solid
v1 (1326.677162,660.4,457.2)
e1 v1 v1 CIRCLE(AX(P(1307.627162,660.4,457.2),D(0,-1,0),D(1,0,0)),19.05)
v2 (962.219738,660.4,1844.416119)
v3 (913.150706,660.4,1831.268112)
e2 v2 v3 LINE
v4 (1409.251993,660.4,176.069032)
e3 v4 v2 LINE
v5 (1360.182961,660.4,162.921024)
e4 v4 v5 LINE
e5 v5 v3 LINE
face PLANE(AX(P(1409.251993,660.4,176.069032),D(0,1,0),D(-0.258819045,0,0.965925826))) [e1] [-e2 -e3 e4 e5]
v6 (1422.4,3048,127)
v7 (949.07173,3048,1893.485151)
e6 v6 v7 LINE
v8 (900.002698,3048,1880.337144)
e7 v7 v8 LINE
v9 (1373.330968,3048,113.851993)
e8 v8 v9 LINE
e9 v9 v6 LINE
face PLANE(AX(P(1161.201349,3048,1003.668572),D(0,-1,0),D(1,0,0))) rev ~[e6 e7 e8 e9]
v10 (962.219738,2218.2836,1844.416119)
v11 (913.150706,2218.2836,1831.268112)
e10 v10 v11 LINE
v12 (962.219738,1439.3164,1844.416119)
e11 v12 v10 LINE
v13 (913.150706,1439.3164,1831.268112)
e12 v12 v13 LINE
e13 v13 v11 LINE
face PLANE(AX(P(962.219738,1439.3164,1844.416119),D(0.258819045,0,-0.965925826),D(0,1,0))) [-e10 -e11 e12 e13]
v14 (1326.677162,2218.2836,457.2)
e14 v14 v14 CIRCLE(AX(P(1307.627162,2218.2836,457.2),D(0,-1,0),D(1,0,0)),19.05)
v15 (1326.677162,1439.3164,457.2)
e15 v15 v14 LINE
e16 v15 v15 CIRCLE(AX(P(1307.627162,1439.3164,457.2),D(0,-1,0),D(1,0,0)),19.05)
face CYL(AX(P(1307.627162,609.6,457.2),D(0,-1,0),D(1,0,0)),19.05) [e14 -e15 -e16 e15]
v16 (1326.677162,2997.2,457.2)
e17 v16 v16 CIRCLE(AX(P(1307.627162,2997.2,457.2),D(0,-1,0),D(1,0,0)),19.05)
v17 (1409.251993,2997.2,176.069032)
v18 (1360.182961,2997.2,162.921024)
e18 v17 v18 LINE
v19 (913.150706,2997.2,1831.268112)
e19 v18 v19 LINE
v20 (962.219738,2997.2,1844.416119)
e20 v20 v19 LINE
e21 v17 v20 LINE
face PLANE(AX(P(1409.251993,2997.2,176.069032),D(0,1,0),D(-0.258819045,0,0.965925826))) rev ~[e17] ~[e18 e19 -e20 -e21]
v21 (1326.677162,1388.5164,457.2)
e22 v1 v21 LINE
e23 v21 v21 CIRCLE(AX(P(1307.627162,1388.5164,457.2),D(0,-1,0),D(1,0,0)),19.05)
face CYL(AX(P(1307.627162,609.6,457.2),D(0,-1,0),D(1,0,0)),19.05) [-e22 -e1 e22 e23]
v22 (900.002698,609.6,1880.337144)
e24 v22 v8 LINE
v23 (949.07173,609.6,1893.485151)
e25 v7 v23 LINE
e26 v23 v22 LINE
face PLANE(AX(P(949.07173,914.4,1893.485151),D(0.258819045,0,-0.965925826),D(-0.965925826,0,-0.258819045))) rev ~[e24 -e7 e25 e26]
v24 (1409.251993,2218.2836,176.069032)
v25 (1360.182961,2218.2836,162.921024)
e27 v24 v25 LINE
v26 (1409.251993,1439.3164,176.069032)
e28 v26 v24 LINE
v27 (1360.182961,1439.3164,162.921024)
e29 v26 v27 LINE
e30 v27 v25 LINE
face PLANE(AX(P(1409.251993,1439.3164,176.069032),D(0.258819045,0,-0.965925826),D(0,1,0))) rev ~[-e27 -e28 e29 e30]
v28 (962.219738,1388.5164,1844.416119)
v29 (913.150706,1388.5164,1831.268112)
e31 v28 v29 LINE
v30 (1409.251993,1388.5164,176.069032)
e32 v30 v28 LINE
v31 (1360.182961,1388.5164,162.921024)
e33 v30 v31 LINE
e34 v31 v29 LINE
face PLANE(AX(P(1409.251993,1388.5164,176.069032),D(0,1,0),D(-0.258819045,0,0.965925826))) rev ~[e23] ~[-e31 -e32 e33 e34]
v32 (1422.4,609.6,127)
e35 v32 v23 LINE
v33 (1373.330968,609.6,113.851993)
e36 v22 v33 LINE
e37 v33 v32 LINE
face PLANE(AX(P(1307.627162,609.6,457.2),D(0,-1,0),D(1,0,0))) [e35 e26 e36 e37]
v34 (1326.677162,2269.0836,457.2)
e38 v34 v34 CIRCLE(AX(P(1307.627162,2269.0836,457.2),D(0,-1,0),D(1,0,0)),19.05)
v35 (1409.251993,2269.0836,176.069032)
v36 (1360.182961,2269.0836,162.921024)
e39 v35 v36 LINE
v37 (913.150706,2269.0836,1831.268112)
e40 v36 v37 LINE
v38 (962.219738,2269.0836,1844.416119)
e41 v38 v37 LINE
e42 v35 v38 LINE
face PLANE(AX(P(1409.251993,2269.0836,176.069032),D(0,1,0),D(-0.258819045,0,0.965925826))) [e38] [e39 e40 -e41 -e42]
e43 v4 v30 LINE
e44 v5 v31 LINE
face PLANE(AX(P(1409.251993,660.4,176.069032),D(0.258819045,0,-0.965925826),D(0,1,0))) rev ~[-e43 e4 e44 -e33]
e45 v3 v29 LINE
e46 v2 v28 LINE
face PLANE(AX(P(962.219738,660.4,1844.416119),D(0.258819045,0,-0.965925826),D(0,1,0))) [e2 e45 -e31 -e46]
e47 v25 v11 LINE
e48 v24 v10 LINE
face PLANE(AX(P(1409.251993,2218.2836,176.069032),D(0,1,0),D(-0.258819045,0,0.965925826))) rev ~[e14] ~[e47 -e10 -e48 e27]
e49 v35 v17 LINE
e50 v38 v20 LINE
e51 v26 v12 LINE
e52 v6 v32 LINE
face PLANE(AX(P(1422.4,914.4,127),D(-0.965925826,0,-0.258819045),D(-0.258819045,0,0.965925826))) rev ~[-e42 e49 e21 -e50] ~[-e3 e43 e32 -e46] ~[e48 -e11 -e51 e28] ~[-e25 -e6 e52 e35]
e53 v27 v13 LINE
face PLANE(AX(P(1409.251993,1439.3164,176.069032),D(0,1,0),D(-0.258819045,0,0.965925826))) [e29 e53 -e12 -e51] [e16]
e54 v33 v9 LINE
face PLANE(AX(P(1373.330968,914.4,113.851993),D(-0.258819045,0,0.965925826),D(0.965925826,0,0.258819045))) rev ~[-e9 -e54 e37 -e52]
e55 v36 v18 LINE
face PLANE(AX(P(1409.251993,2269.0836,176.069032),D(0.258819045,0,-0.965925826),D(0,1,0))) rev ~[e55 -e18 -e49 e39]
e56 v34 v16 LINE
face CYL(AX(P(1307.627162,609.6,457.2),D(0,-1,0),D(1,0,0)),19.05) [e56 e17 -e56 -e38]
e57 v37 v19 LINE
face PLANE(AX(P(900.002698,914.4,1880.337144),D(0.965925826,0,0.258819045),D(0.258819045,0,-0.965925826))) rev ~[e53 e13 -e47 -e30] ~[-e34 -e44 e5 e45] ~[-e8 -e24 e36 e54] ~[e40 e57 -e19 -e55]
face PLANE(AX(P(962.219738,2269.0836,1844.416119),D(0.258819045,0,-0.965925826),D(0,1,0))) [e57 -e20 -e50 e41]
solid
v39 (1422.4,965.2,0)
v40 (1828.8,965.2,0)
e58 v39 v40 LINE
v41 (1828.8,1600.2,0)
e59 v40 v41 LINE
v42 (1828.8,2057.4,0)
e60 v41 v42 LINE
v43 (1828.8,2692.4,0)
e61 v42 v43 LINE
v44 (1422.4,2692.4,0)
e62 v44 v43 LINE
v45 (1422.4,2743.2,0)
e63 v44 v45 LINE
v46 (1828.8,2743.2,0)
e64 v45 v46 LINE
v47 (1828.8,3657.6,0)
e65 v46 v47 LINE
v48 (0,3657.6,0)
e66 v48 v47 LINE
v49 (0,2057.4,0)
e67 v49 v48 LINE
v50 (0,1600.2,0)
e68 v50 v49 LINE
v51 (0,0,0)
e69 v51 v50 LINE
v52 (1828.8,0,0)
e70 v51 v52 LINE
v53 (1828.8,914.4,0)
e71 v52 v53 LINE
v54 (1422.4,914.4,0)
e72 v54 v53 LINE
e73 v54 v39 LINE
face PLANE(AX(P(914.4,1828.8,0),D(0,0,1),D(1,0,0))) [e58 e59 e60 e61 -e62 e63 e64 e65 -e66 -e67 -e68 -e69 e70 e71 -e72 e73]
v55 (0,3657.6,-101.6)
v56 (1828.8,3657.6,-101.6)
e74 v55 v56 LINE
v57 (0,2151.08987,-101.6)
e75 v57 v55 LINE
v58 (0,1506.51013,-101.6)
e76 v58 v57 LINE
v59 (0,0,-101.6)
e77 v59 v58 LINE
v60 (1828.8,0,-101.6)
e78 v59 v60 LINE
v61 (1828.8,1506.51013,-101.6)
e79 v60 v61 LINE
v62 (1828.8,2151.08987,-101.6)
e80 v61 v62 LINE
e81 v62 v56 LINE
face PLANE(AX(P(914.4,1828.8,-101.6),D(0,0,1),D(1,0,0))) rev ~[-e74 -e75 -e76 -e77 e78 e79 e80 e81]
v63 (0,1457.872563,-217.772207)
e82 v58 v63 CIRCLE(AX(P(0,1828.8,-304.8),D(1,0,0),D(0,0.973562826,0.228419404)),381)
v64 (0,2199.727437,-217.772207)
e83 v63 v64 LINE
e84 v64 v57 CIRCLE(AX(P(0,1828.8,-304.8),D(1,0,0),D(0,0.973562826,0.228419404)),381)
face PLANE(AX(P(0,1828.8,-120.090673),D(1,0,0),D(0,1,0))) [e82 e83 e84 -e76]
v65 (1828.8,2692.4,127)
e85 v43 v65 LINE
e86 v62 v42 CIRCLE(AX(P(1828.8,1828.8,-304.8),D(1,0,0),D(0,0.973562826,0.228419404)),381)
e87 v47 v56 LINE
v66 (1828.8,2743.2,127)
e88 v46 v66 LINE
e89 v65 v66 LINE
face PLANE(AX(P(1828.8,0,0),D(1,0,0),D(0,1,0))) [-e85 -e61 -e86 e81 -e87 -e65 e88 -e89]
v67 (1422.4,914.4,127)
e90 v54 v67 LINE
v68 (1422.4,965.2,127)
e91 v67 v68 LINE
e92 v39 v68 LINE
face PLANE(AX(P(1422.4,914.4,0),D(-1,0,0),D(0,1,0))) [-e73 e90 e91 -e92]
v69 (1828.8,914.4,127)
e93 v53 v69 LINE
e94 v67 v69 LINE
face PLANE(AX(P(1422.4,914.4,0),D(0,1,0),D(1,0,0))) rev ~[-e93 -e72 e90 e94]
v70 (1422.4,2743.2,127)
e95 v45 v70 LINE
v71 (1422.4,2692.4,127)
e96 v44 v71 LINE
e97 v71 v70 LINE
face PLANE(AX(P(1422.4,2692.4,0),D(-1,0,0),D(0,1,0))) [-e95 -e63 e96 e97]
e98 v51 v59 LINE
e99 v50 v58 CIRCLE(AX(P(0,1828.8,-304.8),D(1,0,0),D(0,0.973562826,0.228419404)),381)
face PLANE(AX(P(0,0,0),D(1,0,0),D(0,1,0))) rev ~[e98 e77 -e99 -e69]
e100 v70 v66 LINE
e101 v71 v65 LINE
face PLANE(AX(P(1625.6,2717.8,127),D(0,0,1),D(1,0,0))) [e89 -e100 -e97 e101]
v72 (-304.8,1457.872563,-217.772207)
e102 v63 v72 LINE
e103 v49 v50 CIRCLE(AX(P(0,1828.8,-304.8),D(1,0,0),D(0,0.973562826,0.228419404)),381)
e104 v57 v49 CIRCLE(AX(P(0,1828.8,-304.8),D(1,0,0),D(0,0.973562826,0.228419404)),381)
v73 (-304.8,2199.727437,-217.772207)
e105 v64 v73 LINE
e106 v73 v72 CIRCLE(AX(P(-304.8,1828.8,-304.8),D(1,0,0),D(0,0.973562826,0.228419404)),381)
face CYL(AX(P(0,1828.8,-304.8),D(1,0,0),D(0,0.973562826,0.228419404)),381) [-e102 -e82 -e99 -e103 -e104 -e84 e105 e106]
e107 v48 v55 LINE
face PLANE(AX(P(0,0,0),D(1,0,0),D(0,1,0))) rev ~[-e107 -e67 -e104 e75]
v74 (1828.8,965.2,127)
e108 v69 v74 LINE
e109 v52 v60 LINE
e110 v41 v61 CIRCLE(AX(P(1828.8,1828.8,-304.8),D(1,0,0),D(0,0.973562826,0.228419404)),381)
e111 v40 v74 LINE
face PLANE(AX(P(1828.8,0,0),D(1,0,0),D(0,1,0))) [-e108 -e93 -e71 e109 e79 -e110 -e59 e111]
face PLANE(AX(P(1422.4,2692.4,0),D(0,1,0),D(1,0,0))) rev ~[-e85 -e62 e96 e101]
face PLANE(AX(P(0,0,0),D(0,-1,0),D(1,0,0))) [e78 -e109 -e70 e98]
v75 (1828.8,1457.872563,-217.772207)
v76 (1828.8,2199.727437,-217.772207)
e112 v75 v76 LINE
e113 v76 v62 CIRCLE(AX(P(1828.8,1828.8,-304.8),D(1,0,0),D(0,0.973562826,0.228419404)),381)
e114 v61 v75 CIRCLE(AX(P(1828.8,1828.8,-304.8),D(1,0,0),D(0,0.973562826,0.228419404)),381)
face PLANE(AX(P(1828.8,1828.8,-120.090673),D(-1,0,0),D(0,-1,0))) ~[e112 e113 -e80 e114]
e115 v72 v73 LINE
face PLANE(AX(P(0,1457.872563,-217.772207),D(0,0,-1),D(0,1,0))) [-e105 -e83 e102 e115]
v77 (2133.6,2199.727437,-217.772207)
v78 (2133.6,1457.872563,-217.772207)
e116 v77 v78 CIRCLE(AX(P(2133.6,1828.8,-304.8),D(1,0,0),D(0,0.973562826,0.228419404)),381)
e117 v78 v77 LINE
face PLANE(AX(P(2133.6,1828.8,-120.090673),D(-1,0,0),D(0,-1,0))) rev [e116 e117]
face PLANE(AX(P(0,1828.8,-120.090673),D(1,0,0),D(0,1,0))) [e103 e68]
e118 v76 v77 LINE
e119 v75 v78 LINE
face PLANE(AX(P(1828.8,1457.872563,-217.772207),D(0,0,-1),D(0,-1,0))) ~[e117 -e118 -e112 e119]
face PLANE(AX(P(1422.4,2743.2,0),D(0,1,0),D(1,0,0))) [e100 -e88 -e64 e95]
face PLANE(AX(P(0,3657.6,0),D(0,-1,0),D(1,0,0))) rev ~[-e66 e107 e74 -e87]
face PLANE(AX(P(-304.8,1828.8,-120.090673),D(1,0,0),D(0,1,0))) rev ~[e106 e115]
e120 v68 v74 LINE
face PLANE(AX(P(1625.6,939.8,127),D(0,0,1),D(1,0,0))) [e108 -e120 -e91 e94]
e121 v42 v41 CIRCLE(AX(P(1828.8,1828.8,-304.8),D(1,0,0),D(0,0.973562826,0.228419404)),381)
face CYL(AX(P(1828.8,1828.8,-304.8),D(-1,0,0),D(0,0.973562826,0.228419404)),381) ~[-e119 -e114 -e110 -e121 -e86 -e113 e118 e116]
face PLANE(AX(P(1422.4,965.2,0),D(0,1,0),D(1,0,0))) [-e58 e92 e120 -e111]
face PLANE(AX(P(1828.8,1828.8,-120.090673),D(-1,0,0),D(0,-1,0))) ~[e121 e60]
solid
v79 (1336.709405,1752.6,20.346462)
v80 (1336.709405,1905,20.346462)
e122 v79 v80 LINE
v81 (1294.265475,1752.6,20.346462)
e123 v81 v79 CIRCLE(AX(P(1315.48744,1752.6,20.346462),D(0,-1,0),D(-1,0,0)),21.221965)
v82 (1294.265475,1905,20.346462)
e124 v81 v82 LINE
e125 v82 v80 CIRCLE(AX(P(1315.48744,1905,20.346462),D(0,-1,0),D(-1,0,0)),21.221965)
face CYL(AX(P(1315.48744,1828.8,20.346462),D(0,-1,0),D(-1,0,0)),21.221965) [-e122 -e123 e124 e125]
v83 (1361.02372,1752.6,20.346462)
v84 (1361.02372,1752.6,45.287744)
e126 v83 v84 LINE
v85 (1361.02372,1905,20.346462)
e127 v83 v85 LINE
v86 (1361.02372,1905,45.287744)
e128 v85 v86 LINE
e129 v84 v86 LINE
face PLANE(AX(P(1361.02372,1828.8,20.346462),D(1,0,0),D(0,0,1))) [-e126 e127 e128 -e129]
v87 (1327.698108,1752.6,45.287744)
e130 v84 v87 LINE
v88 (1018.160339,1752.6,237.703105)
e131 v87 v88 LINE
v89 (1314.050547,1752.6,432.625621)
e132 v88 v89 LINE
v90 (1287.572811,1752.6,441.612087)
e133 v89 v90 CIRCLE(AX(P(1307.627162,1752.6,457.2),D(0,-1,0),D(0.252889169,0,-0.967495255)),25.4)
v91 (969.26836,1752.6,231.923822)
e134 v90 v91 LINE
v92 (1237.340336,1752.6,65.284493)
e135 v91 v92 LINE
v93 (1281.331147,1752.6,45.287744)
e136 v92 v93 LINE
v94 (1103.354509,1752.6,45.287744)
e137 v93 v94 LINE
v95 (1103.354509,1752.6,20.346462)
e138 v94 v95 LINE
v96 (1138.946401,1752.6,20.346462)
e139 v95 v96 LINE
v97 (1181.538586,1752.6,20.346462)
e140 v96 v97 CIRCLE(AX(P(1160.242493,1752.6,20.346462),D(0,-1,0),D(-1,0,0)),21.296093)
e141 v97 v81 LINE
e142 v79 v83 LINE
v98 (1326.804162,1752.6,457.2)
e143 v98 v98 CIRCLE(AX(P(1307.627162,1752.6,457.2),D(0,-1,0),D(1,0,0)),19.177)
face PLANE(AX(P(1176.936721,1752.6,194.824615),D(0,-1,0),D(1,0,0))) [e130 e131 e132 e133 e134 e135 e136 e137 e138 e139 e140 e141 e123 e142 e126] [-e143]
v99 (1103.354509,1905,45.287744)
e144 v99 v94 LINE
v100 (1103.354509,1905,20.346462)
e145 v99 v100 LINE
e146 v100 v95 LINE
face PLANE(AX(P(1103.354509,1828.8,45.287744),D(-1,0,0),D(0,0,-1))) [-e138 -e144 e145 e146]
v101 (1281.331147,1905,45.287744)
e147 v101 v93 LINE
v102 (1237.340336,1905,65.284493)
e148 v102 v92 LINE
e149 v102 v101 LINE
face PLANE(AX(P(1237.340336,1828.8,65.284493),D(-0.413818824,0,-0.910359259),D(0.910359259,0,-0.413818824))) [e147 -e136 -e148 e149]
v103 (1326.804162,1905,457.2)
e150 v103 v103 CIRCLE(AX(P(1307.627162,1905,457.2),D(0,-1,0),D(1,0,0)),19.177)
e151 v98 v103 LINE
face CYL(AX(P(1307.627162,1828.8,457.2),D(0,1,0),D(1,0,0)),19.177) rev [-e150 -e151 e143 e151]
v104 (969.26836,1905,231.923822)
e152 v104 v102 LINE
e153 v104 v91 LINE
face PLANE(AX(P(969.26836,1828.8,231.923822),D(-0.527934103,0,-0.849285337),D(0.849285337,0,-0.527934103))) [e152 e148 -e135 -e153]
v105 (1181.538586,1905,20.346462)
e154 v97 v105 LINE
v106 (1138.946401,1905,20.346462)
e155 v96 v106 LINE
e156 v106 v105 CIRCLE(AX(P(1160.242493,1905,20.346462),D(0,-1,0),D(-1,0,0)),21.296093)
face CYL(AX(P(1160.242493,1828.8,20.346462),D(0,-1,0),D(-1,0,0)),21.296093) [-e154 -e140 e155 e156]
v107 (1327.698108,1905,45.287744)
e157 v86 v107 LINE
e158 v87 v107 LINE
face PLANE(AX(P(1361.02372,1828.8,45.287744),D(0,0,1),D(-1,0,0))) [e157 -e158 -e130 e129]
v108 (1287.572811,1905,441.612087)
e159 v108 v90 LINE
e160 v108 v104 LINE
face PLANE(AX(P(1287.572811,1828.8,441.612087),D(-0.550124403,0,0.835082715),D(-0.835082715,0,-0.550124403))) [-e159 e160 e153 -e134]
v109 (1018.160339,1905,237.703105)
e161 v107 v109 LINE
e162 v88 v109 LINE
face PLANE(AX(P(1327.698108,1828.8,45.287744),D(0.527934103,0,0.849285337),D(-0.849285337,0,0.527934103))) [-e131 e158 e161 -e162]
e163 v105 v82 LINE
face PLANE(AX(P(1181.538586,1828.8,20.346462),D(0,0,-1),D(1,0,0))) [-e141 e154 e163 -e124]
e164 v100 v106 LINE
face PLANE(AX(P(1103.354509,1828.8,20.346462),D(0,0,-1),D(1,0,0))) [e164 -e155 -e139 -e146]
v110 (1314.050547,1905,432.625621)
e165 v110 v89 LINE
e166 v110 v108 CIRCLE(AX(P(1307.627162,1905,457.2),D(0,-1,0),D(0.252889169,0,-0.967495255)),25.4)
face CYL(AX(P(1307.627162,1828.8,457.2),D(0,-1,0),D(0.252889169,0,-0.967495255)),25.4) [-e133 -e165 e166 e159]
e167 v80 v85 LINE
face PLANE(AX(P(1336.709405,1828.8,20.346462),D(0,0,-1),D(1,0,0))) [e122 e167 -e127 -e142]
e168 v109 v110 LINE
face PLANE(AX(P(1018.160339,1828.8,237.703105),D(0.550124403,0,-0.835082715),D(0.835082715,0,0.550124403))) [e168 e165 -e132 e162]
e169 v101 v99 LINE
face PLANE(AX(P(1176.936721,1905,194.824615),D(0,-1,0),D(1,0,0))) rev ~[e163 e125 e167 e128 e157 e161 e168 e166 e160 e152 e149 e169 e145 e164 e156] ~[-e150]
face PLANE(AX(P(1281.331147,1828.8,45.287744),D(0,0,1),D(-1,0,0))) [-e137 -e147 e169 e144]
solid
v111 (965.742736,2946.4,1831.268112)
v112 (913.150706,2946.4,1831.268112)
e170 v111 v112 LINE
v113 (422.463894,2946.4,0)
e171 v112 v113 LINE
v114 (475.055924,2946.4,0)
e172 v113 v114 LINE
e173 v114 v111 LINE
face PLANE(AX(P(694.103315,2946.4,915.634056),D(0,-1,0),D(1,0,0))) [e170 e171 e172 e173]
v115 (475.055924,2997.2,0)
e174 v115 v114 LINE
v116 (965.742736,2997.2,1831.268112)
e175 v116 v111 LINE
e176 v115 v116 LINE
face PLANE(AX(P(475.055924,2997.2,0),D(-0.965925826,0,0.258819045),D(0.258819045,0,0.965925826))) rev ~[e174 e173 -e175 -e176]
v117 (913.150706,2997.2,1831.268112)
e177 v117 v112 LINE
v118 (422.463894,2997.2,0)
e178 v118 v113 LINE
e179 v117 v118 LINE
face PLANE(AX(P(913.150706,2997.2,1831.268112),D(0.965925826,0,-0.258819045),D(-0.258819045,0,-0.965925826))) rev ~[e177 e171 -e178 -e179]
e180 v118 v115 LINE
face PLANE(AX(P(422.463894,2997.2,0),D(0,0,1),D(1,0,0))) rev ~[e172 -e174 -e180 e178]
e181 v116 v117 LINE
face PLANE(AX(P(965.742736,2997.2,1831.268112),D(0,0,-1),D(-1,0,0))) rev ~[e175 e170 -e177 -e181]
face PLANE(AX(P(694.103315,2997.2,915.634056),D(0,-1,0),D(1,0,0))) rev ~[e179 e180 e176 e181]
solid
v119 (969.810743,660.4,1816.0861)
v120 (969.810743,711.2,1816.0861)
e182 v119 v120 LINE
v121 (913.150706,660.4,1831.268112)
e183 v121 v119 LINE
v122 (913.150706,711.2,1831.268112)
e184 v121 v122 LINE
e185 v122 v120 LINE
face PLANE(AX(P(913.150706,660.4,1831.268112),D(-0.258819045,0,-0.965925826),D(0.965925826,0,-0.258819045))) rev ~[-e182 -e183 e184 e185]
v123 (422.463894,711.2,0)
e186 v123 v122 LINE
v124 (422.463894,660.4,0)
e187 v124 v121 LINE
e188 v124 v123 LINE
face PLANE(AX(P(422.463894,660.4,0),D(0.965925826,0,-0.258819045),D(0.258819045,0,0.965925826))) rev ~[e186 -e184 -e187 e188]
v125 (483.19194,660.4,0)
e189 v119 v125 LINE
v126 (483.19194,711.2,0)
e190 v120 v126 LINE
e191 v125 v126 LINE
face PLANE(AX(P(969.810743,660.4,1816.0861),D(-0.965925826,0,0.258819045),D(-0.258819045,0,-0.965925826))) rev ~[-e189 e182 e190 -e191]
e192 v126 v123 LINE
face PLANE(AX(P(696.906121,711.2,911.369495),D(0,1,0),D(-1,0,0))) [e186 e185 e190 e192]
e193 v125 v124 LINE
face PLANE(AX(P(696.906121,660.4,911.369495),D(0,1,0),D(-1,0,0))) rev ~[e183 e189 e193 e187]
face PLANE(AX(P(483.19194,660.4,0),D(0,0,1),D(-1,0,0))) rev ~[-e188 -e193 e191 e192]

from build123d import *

# Parameters (mm, degrees)
F0_W      = 1828.8
F0_H      = 3657.6
F1_DEPTH  = 101.6
F3_DEPTH  = 304.8
F5_W      = 406.4
F5_H      = 50.8
F6_DEPTH  = 127
F8_DEPTH  = 2133.6
F9_DEPTH  = 304.8
F10_W     = 728.1164
F10_H     = 1727.2
F10_W_2   = 778.9672
F11_DEPTH = 1757.5817005799
F12_R     = 19.05
F13_DEPTH = 2438.4
F15_R     = 19.177
F16_DEPTH = 76.2
F18_DEPTH = 50.8
F20_DEPTH = 50.8


# Not quite as in the source:
# - a pattern or mirror of a feature is missing from the dataset's text; its kind, count and spacing are read off the source's solid


with BuildPart() as f1:
    # F0 (on Top) → F1 (new body)
    with BuildSketch(Plane.XY):
        with Locations((914.4, 1828.8)):
            Rectangle(F0_W, F0_H)
    extrude(amount=-F1_DEPTH)

    # F2 (on Right) → F3 (join)
    with BuildSketch(Plane.YZ):
        with BuildLine():
            Line((1457.8725633512, -217.7722070765), (2199.7274366488, -217.7722070765))
            ThreePointArc((2199.7274366488, -217.7722070765), (1828.8, 76.2), (1457.8725633512, -217.7722070765))
        make_face()
    f3 = extrude(amount=-F3_DEPTH)

    # F3_copies: F3 across plane
    add(f3.mirror(Plane(origin=(914.4, 0, 0), x_dir=(0, 0, 1), z_dir=(1, 0, 0))))

    # F5 (on face) → F6 (join)
    with BuildSketch(Plane.XY):
        with Locations((1625.6, 939.8)):
            Rectangle(F5_W, F5_H)
        with Locations((1625.6, 2717.8)):
            Rectangle(F5_W, F5_H)
    extrude(amount=F6_DEPTH)


with BuildPart() as f8:
    # F7 (on face) → F8 (new body)
    with BuildSketch(Plane.XZ.offset(-914.4)):
        Polygon((1373.3309680245, 113.8519925088), (1422.4, 127), (949.0717303165, 1893.4851511174), (900.002698341, 1880.3371436262), align=None)
    extrude(amount=-F8_DEPTH)

    # F7 (on face) → F9 (join)
    with BuildSketch(Plane.XZ.offset(-914.4)):
        Polygon((1373.3309680245, 113.8519925088), (1422.4, 127), (949.0717303165, 1893.4851511174), (900.002698341, 1880.3371436262), align=None)
    extrude(amount=F9_DEPTH)

    # F10 (on face) → F11 (cut, through all)
    with BuildSketch(Plane(origin=(1358.8672671715, 0, 364.1073868597), x_dir=(0, 1, 0), z_dir=(0.9659258263, 0, 0.2588190451))):
        with Locations((1024.4582, 668.9283701849)):
            Rectangle(F10_W, F10_H)
        with Locations((2633.1418, 668.9283701849)):
            Rectangle(F10_W, F10_H)
        with Locations((1828.8, 668.9283701849)):
            Rectangle(F10_W_2, F10_H)
    extrude(amount=-F11_DEPTH, mode=Mode.SUBTRACT)

    # F12 (on face) → F13 (join)
    with BuildSketch(Plane.XZ.offset(-609.6)):
        with Locations((1307.6271616768, 457.2)):
            Circle(F12_R)
    extrude(amount=-F13_DEPTH)


with BuildPart() as f16:
    # F15 (on offset) → F16 (new body, symmetric)
    with BuildSketch(Plane.XZ.offset(-1828.8)):
        with BuildLine():
            Line((1018.1603394521, 237.7031047405), (1314.0505465733, 432.6256205272))
            ThreePointArc((1314.0505465733, 432.6256205272), (1315.7904914246, 481.2524436894), (1287.5728110962, 441.6120872856))
            Line((1287.5728110962, 441.6120872856), (969.2683602777, 231.9238216842))
            Line((969.2683602777, 231.9238216842), (1237.3403362105, 65.2844932284))
            Line((1237.3403362105, 65.2844932284), (1281.3311466944, 45.2877443791))
            Line((1281.3311466944, 45.2877443791), (1103.3545091502, 45.2877443791))
            Line((1103.3545091502, 45.2877443791), (1103.3545091502, 20.3464620363))
            Line((1103.3545091502, 20.3464620363), (1138.9464007844, 20.3464620363))
            ThreePointArc((1138.9464007844, 20.3464620363), (1160.242493426, -0.9496306053), (1181.5385860676, 20.3464620363))
            Line((1181.5385860676, 20.3464620363), (1294.2654747231, 20.3464620363))
            ThreePointArc((1294.2654747231, 20.3464620363), (1315.4874399058, -0.8755031465), (1336.7094050886, 20.3464620363))
            Line((1336.7094050886, 20.3464620363), (1361.0237195842, 20.3464620363))
            Line((1361.0237195842, 20.3464620363), (1361.0237195842, 45.2877443791))
            Line((1361.0237195842, 45.2877443791), (1327.6981078161, 45.2877443791))
            Line((1327.6981078161, 45.2877443791), (1018.1603394521, 237.7031047405))
        make_face()
        with Locations((1307.6271616768, 457.2)):
            Circle(F15_R, mode=Mode.SUBTRACT)
    extrude(amount=F16_DEPTH, both=True)


with BuildPart() as f18:
    # F17 (on face) → F18 (new body)
    with BuildSketch(Plane(origin=(0, 660.4, 0), x_dir=(-1, 0, 0), z_dir=(0, 1, 0))):
        Polygon((-422.4638941905, 0), (-913.1507058322, 1831.2681116508), (-969.8107434721, 1816.086100322), (-483.1919395054, 0), align=None)
    extrude(amount=F18_DEPTH)


with BuildPart() as f20:
    # F19 (on face) → F20 (new body)
    with BuildSketch(Plane.XZ.offset(-2997.2)):
        Polygon((965.7427357971, 1831.2681116508), (913.1507058322, 1831.2681116508), (422.4638941905, 0), (475.0559241553, 0), align=None)
    extrude(amount=F20_DEPTH)


solid = Compound([f1.part, f8.part, f16.part, f18.part, f20.part])
